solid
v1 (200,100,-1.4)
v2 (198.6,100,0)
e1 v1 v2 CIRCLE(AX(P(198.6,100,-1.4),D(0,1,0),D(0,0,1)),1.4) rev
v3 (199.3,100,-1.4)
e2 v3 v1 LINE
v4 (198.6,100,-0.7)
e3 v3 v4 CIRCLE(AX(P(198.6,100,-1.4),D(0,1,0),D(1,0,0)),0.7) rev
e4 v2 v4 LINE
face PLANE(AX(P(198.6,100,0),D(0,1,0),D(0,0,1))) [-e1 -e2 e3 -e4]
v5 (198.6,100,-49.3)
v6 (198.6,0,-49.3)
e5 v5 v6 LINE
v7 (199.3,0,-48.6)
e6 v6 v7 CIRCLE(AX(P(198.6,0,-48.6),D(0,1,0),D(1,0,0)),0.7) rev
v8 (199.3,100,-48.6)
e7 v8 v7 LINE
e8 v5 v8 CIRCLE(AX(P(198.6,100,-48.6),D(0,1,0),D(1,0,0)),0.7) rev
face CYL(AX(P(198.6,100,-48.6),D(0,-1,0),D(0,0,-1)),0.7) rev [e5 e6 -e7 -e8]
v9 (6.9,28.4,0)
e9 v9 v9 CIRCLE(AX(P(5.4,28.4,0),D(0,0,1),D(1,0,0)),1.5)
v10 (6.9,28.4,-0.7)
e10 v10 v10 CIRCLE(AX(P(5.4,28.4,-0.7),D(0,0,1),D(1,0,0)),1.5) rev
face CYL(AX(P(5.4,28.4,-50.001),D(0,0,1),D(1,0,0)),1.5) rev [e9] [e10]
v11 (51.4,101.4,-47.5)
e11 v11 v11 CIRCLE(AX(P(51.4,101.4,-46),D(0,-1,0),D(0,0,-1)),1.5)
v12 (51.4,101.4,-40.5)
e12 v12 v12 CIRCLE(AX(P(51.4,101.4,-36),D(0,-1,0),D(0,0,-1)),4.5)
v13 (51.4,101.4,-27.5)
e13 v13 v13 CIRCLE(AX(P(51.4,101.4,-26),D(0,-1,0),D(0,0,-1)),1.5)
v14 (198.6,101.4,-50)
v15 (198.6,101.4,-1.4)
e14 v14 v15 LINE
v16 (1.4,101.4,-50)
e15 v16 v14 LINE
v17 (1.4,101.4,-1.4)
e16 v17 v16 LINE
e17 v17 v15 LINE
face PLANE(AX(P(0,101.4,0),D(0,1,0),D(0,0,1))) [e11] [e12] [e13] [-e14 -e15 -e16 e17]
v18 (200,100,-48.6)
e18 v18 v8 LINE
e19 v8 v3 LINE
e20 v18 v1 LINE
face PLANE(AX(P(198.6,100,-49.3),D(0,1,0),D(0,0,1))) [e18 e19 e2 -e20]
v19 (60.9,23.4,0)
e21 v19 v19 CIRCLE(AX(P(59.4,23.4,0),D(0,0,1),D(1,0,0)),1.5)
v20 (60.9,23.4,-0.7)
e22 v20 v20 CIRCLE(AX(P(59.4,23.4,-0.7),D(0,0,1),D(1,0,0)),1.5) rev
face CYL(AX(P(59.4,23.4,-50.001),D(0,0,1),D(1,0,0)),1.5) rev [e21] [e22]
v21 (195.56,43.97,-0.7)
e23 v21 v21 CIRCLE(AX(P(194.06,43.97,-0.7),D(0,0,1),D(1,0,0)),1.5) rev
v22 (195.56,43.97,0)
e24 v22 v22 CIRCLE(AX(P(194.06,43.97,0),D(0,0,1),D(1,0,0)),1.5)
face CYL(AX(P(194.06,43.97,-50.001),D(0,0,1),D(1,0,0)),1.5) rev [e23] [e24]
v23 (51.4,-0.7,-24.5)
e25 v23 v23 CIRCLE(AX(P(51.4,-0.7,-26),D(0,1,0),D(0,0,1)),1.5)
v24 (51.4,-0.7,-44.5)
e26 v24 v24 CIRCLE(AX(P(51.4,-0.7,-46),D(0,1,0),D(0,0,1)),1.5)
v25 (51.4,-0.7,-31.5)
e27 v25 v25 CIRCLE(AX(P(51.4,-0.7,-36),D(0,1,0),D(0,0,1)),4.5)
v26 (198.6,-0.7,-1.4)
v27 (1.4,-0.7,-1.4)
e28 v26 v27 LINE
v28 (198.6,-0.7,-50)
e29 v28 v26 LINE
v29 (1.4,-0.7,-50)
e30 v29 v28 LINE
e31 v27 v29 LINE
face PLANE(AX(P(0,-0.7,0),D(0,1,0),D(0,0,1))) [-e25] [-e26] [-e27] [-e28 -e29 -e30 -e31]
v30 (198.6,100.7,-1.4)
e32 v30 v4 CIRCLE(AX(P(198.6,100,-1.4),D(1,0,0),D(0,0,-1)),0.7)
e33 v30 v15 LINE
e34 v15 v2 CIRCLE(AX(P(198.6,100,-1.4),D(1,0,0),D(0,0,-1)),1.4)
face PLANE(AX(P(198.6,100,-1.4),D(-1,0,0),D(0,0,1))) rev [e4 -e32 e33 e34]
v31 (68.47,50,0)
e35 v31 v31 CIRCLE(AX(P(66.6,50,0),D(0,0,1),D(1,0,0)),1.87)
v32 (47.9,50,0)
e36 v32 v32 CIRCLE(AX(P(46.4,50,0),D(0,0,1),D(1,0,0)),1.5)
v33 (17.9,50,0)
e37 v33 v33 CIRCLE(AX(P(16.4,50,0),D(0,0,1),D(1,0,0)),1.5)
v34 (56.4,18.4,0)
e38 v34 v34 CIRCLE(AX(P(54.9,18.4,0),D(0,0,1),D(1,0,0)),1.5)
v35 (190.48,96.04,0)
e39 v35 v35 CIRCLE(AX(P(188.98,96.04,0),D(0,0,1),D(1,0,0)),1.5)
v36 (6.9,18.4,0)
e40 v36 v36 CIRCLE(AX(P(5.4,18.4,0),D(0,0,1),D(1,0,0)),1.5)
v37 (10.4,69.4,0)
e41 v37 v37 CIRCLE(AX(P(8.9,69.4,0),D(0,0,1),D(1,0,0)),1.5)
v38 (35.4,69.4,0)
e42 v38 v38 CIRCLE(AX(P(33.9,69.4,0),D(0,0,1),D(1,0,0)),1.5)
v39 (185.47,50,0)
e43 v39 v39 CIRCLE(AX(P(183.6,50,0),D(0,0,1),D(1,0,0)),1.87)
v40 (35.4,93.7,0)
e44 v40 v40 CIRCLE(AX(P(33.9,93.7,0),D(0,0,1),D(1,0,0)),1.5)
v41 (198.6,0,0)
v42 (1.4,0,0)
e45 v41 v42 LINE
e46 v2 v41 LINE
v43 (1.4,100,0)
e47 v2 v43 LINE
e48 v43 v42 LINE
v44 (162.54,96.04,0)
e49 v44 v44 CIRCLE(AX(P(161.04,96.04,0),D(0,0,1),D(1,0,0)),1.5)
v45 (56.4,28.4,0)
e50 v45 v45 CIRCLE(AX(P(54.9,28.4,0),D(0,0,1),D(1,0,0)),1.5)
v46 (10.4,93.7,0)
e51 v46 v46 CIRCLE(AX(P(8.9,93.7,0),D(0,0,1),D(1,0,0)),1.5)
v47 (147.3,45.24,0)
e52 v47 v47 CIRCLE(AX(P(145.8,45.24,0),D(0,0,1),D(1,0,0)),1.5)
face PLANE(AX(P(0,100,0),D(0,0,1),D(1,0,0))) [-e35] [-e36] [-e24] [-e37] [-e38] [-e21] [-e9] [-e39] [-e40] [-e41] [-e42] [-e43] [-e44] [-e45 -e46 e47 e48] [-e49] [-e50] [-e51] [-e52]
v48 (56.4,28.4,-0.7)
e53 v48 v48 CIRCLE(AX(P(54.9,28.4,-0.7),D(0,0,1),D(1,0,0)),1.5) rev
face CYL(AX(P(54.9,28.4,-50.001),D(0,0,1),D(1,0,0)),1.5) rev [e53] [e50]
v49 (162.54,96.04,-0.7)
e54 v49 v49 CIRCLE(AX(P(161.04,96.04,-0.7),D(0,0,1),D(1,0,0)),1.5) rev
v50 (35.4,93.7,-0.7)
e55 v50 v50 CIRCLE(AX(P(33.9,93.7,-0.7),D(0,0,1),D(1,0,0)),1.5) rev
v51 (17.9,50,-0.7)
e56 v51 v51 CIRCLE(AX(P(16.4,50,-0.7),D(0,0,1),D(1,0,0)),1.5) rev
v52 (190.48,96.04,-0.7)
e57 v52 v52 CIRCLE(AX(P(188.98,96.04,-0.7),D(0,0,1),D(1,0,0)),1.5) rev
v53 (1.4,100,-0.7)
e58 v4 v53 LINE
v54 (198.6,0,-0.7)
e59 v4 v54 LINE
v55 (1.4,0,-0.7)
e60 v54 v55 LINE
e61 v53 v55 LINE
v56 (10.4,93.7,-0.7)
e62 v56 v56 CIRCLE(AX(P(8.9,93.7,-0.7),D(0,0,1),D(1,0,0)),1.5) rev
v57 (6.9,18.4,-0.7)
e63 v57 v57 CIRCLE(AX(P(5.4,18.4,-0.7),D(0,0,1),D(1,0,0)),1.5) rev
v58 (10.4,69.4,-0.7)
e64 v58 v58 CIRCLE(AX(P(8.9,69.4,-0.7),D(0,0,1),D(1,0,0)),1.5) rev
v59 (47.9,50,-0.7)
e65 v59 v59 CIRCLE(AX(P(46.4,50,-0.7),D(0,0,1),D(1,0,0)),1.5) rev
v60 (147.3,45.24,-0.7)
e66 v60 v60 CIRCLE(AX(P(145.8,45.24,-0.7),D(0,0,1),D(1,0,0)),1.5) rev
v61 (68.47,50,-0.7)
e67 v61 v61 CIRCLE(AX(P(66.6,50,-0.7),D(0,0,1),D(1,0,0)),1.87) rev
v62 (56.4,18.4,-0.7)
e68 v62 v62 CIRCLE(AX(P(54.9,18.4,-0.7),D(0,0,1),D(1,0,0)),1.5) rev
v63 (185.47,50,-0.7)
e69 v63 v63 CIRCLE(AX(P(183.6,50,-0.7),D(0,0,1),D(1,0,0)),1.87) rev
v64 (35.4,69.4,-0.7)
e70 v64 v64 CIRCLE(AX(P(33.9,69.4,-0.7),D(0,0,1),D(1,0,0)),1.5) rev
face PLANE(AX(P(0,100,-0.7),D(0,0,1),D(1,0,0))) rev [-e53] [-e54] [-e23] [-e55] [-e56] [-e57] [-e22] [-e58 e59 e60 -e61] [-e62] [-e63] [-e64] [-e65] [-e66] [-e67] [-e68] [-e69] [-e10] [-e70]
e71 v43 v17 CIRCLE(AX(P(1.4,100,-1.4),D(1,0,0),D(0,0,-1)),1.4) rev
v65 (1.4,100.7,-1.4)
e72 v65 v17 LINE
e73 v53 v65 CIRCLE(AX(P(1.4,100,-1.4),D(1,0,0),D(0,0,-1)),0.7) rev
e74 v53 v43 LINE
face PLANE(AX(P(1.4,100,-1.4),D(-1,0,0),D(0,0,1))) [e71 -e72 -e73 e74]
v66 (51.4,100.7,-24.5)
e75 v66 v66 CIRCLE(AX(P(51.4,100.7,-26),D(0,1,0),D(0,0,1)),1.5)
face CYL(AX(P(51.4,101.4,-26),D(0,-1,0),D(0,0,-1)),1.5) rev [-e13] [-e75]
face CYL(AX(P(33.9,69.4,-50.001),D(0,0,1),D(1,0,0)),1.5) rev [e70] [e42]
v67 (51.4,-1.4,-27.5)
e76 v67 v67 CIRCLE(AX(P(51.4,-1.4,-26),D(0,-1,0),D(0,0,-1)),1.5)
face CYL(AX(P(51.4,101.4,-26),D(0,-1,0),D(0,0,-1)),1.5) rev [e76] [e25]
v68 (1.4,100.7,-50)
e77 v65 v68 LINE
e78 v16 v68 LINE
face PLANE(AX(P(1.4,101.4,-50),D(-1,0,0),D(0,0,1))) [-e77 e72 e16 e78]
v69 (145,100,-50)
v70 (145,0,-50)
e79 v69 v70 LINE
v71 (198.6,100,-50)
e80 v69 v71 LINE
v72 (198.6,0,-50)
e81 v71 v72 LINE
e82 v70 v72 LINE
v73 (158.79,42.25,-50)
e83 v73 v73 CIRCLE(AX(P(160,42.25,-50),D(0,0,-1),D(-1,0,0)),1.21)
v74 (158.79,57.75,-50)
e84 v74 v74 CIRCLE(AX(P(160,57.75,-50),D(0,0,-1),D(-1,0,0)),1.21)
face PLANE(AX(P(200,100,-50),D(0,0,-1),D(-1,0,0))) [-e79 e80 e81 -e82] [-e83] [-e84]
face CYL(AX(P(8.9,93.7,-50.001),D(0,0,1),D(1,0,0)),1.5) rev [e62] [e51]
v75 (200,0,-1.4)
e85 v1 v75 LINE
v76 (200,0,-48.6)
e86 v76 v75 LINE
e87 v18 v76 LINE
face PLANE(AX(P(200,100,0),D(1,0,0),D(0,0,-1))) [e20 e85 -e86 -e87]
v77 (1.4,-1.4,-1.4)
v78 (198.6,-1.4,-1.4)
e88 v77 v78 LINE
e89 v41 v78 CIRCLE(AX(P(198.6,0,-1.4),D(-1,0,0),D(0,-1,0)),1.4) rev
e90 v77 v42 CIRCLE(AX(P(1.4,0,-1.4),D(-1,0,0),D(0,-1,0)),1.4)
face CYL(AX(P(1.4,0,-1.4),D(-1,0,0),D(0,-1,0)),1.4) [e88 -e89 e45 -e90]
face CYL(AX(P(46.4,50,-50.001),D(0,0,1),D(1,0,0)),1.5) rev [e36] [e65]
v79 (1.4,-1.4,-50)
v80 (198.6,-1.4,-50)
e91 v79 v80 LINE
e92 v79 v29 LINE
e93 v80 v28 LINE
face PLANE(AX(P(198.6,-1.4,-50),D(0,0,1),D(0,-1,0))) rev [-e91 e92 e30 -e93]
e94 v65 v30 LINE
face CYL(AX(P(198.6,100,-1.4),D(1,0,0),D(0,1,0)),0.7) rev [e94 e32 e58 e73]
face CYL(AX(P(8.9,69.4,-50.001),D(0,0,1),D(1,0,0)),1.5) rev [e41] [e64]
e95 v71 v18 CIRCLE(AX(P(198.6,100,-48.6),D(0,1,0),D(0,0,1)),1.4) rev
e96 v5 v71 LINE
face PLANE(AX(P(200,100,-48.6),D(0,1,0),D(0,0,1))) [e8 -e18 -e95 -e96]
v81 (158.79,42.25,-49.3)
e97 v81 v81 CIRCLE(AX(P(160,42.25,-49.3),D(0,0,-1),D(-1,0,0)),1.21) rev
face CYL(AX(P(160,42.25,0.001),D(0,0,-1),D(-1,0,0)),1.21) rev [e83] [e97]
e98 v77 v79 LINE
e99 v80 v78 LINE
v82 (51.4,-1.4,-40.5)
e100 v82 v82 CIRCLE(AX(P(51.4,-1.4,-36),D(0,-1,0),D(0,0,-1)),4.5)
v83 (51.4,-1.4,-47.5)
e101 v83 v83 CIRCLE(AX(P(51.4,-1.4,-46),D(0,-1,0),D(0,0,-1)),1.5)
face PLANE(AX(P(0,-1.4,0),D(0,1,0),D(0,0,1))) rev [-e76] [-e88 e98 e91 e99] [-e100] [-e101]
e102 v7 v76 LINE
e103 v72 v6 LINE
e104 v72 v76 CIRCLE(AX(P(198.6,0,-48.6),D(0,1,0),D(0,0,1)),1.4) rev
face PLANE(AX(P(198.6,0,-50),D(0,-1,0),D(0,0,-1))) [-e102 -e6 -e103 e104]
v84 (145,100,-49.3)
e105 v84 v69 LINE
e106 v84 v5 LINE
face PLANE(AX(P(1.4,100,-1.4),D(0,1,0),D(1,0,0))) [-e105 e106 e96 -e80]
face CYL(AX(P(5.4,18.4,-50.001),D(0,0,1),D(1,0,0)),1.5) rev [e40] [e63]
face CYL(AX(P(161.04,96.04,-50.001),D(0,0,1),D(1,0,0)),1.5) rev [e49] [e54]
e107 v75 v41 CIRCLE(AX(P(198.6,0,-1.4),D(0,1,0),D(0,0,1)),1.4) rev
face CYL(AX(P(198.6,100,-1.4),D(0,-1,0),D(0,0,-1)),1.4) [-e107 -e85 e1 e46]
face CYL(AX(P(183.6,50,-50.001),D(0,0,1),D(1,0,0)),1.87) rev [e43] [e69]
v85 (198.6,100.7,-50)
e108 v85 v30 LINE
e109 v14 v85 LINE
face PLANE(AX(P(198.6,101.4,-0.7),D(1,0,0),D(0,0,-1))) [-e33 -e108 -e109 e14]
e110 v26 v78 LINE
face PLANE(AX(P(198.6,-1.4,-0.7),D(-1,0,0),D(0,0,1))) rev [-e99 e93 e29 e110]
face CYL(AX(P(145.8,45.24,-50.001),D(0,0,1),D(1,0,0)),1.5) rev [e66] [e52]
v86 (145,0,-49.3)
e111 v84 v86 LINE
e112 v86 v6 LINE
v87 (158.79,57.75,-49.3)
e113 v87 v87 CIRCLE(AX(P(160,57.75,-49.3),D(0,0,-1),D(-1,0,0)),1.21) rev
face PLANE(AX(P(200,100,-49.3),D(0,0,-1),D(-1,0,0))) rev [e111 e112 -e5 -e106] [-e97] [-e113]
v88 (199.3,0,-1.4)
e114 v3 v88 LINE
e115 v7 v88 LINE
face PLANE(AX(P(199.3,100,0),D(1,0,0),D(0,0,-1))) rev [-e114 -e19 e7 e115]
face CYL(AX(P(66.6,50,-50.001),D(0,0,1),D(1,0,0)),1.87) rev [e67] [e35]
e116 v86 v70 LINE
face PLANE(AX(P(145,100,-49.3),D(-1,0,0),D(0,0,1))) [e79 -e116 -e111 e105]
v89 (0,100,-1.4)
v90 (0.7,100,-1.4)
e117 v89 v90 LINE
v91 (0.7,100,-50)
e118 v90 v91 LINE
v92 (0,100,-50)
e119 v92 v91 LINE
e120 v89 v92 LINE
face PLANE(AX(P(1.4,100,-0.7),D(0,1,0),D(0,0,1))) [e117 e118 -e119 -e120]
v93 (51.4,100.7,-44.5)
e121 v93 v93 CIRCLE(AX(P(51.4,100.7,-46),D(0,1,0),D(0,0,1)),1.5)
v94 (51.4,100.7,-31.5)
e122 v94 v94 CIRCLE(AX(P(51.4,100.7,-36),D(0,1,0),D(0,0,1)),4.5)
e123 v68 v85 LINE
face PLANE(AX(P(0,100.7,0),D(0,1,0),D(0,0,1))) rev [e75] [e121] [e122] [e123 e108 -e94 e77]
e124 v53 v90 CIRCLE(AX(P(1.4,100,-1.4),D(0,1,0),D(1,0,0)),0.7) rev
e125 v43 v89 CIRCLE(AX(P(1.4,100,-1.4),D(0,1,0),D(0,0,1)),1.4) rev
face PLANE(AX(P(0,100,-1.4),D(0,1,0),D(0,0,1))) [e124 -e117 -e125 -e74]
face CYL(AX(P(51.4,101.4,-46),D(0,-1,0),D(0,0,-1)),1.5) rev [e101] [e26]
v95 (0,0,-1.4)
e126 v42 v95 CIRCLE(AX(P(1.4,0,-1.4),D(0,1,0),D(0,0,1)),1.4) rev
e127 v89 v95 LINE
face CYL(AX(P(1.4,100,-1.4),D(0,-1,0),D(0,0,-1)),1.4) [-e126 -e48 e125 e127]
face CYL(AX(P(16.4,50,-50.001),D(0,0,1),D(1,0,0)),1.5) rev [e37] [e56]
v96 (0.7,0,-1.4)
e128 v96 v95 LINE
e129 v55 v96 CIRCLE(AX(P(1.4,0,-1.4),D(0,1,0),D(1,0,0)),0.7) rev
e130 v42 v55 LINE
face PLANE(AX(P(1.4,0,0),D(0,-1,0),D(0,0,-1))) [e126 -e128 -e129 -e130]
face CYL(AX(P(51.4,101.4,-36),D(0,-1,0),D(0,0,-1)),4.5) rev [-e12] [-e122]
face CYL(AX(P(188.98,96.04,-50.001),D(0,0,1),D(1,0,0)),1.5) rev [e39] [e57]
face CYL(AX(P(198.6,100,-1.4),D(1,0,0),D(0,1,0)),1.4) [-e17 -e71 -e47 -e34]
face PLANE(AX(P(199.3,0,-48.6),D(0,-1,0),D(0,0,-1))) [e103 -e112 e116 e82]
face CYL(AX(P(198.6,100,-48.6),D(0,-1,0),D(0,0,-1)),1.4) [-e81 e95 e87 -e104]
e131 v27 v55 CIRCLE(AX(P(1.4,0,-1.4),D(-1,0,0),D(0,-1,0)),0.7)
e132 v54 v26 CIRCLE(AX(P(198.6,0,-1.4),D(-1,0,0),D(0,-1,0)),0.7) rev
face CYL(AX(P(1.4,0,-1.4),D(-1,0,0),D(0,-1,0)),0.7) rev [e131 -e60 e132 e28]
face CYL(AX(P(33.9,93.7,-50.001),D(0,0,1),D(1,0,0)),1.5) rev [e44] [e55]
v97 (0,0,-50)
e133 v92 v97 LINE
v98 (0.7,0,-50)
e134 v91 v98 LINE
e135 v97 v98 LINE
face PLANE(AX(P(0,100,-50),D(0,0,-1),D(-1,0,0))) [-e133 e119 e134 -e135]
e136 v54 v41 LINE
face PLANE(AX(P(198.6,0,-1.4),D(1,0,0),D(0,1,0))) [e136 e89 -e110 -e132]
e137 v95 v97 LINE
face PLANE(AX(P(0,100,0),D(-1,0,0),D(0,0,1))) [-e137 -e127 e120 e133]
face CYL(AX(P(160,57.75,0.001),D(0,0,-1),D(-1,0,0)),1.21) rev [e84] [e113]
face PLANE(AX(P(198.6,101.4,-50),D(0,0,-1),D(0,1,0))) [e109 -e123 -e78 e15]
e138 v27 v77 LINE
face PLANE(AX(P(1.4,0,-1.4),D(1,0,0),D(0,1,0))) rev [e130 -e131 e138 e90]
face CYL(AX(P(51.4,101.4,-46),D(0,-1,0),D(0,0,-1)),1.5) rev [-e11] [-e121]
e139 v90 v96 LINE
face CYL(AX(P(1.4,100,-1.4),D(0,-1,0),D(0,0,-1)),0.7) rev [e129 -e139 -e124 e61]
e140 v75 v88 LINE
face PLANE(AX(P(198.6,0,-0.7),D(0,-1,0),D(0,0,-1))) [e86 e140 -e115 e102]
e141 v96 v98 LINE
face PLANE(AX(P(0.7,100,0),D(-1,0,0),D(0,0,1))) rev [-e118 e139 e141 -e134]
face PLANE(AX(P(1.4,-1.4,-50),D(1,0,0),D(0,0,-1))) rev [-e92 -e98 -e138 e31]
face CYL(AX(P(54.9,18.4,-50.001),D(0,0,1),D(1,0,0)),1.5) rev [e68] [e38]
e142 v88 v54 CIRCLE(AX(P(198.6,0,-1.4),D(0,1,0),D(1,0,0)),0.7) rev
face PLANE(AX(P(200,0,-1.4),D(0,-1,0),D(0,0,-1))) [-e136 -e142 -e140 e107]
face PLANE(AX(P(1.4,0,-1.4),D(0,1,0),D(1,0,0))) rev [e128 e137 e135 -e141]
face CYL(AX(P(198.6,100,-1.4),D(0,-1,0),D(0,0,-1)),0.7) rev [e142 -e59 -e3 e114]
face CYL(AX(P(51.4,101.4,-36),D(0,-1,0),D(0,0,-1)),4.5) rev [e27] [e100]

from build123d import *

# Parameters (mm, degrees)
BASE_FLANGE1_DEPTH = 100
EDGE_FLANGE1_DEPTH = 197.2
EDGE_FLANGE2_DEPTH = 197.2
HOLE1_START        = -1.4
HOLE1_OUTLINE_R    = 4.5
HOLE1_OUTLINE_R_2  = 1.5
HOLE1_DEPTH        = 102.8
CUT_EXTRUDE2_REACH = 231.743
SKETCH20_R         = 1.21
CUT_EXTRUDE3_REACH = 231.743
SKETCH22_R         = 1.5
SKETCH22_R_2       = 1.87
CUT_EXTRUDE5_REACH = 231.743
SKETCH26_R         = 1.5
CUT_EXTRUDE6_REACH = 231.743
SKETCH27_R         = 1.5
CUT_EXTRUDE7_REACH = 231.743
SKETCH28_R         = 1.5


# Read off the part's stored shape, not the designer's step: Hole1
# Sheet-metal steps are written as plain solids
with BuildPart() as part:
    # Sketch1 → Base-Flange1 (new body)
    with BuildSketch(Plane(origin=(0, 0, 0), x_dir=(1, 0, 0), z_dir=(0, 1, 0))):
        with BuildLine():
            Line((0, 50), (0, 1.4))
            ThreePointArc((0, 1.4), (0.410050506, 0.410050506), (1.4, 0))
            Line((1.4, 0), (198.6, 0))
            ThreePointArc((198.6, 0), (199.589949494, 0.410050506), (200, 1.4))
            Line((200, 1.4), (200, 48.6))
            ThreePointArc((200, 48.6), (199.589949494, 49.589949494), (198.6, 50))
            Line((198.6, 50), (145, 50))
            Line((145, 50), (145, 49.3))
            Line((145, 49.3), (198.6, 49.3))
            ThreePointArc((198.6, 49.3), (199.094974747, 49.094974747), (199.3, 48.6))
            Line((199.3, 48.6), (199.3, 1.4))
            ThreePointArc((199.3, 1.4), (199.094974747, 0.905025253), (198.6, 0.7))
            Line((198.6, 0.7), (1.4, 0.7))
            ThreePointArc((1.4, 0.7), (0.905025253, 0.905025253), (0.7, 1.4))
            Line((0.7, 1.4), (0.7, 50))
            Line((0.7, 50), (0, 50))
        make_face()
    extrude(amount=BASE_FLANGE1_DEPTH)

    # Edge-Flange1 section (across the edge) → Edge-Flange1 (add)
    with BuildSketch(Plane(origin=(198.6, -0.7, -0.7), x_dir=(0, 1, 0), z_dir=(-1, 0, 0))):
        with BuildLine():
            Line((-0.7, 0.7), (-0.7, 49.3))
            Line((-0.7, 49.3), (0, 49.3))
            Line((0, 49.3), (0, 0.7))
            ThreePointArc((0, 0.7), (0.205025253, 0.205025253), (0.7, 0))
            Line((0.7, 0), (0.7, -0.7))
            ThreePointArc((0.7, -0.7), (-0.289949494, -0.289949494), (-0.7, 0.7))
        make_face()
    extrude(amount=EDGE_FLANGE1_DEPTH)

    # Edge-Flange2 section (across the edge) → Edge-Flange2 (add)
    with BuildSketch(Plane(origin=(1.4, 100.7, -0.7), x_dir=(0, -1, 0), z_dir=(1, 0, 0))):
        with BuildLine():
            Line((-0.7, 0.7), (-0.7, 49.3))
            Line((-0.7, 49.3), (0, 49.3))
            Line((0, 49.3), (0, 0.7))
            ThreePointArc((0, 0.7), (0.205025253, 0.205025253), (0.7, 0))
            Line((0.7, 0), (0.7, -0.7))
            ThreePointArc((0.7, -0.7), (-0.289949494, -0.289949494), (-0.7, 0.7))
        make_face()
    extrude(amount=EDGE_FLANGE2_DEPTH)

    # Hole1 outline → Hole1 (cut)
    with BuildSketch(Plane(origin=(0, 0, 0), x_dir=(1, 0, 0), z_dir=(0, 1, 0)).offset(HOLE1_START)):
        with Locations((51.4, 36)):
            Circle(HOLE1_OUTLINE_R)
        with Locations((51.4, 26)):
            Circle(HOLE1_OUTLINE_R_2)
        with Locations((51.4, 46)):
            Circle(HOLE1_OUTLINE_R_2)
    extrude(amount=HOLE1_DEPTH, mode=Mode.SUBTRACT)

    # Sketch20 → Cut-Extrude2 (cut, up to next)
    with BuildSketch(Plane(origin=(0, 0, -50), x_dir=(-1, 0, 0), z_dir=(0, 0, -1)), mode=Mode.PRIVATE) as cut_extrude2_sk1:
        with Locations((-160, 57.75)):
            Circle(SKETCH20_R)
    cut_extrude2_tool1 = extrude(cut_extrude2_sk1.sketch, amount=-CUT_EXTRUDE2_REACH, mode=Mode.PRIVATE) & part.part
    # Sketch20 → Cut-Extrude2 (cut, up to next)
    with BuildSketch(Plane(origin=(0, 0, -50), x_dir=(-1, 0, 0), z_dir=(0, 0, -1)), mode=Mode.PRIVATE) as cut_extrude2_sk2:
        with Locations((-160, 42.25)):
            Circle(SKETCH20_R)
    cut_extrude2_tool2 = extrude(cut_extrude2_sk2.sketch, amount=-CUT_EXTRUDE2_REACH, mode=Mode.PRIVATE) & part.part
    add(cut_extrude2_tool1.solids().sort_by_distance((160, 57.75, -50))[0], mode=Mode.SUBTRACT)
    add(cut_extrude2_tool2.solids().sort_by_distance((160, 42.25, -50))[0], mode=Mode.SUBTRACT)

    # Sketch22 → Cut-Extrude3 (cut, up to next)
    with BuildSketch(Plane.XY, mode=Mode.PRIVATE) as cut_extrude3_sk1:
        with Locations((16.4, 50)):
            Circle(SKETCH22_R)
    cut_extrude3_tool1 = extrude(cut_extrude3_sk1.sketch, amount=-CUT_EXTRUDE3_REACH, mode=Mode.PRIVATE) & part.part
    # Sketch22 → Cut-Extrude3 (cut, up to next)
    with BuildSketch(Plane.XY, mode=Mode.PRIVATE) as cut_extrude3_sk2:
        with Locations((46.4, 50)):
            Circle(SKETCH22_R)
    cut_extrude3_tool2 = extrude(cut_extrude3_sk2.sketch, amount=-CUT_EXTRUDE3_REACH, mode=Mode.PRIVATE) & part.part
    # Sketch22 → Cut-Extrude3 (cut, up to next)
    with BuildSketch(Plane.XY, mode=Mode.PRIVATE) as cut_extrude3_sk3:
        with Locations((66.6, 50)):
            Circle(SKETCH22_R_2)
    cut_extrude3_tool3 = extrude(cut_extrude3_sk3.sketch, amount=-CUT_EXTRUDE3_REACH, mode=Mode.PRIVATE) & part.part
    # Sketch22 → Cut-Extrude3 (cut, up to next)
    with BuildSketch(Plane.XY, mode=Mode.PRIVATE) as cut_extrude3_sk4:
        with Locations((183.6, 50)):
            Circle(SKETCH22_R_2)
    cut_extrude3_tool4 = extrude(cut_extrude3_sk4.sketch, amount=-CUT_EXTRUDE3_REACH, mode=Mode.PRIVATE) & part.part
    add(cut_extrude3_tool1.solids().sort_by_distance((16.4, 50, 0))[0], mode=Mode.SUBTRACT)
    add(cut_extrude3_tool2.solids().sort_by_distance((46.4, 50, 0))[0], mode=Mode.SUBTRACT)
    add(cut_extrude3_tool3.solids().sort_by_distance((66.6, 50, 0))[0], mode=Mode.SUBTRACT)
    add(cut_extrude3_tool4.solids().sort_by_distance((183.6, 50, 0))[0], mode=Mode.SUBTRACT)

    # Sketch26 → Cut-Extrude5 (cut, up to next)
    with BuildSketch(Plane.XY, mode=Mode.PRIVATE) as cut_extrude5_sk1:
        with Locations((5.4, 28.4)):
            Circle(SKETCH26_R)
    cut_extrude5_tool1 = extrude(cut_extrude5_sk1.sketch, amount=-CUT_EXTRUDE5_REACH, mode=Mode.PRIVATE) & part.part
    # Sketch26 → Cut-Extrude5 (cut, up to next)
    with BuildSketch(Plane.XY, mode=Mode.PRIVATE) as cut_extrude5_sk2:
        with Locations((54.9, 28.4)):
            Circle(SKETCH26_R)
    cut_extrude5_tool2 = extrude(cut_extrude5_sk2.sketch, amount=-CUT_EXTRUDE5_REACH, mode=Mode.PRIVATE) & part.part
    # Sketch26 → Cut-Extrude5 (cut, up to next)
    with BuildSketch(Plane.XY, mode=Mode.PRIVATE) as cut_extrude5_sk3:
        with Locations((54.9, 18.4)):
            Circle(SKETCH26_R)
    cut_extrude5_tool3 = extrude(cut_extrude5_sk3.sketch, amount=-CUT_EXTRUDE5_REACH, mode=Mode.PRIVATE) & part.part
    # Sketch26 → Cut-Extrude5 (cut, up to next)
    with BuildSketch(Plane.XY, mode=Mode.PRIVATE) as cut_extrude5_sk4:
        with Locations((5.4, 18.4)):
            Circle(SKETCH26_R)
    cut_extrude5_tool4 = extrude(cut_extrude5_sk4.sketch, amount=-CUT_EXTRUDE5_REACH, mode=Mode.PRIVATE) & part.part
    # Sketch26 → Cut-Extrude5 (cut, up to next)
    with BuildSketch(Plane.XY, mode=Mode.PRIVATE) as cut_extrude5_sk5:
        with Locations((59.4, 23.4)):
            Circle(SKETCH26_R)
    cut_extrude5_tool5 = extrude(cut_extrude5_sk5.sketch, amount=-CUT_EXTRUDE5_REACH, mode=Mode.PRIVATE) & part.part
    add(cut_extrude5_tool1.solids().sort_by_distance((5.4, 28.4, 0))[0], mode=Mode.SUBTRACT)
    add(cut_extrude5_tool2.solids().sort_by_distance((54.9, 28.4, 0))[0], mode=Mode.SUBTRACT)
    add(cut_extrude5_tool3.solids().sort_by_distance((54.9, 18.4, 0))[0], mode=Mode.SUBTRACT)
    add(cut_extrude5_tool4.solids().sort_by_distance((5.4, 18.4, 0))[0], mode=Mode.SUBTRACT)
    add(cut_extrude5_tool5.solids().sort_by_distance((59.4, 23.4, 0))[0], mode=Mode.SUBTRACT)

    # Sketch27 → Cut-Extrude6 (cut, up to next)
    with BuildSketch(Plane.XY, mode=Mode.PRIVATE) as cut_extrude6_sk1:
        with Locations((8.9, 93.7)):
            Circle(SKETCH27_R)
    cut_extrude6_tool1 = extrude(cut_extrude6_sk1.sketch, amount=-CUT_EXTRUDE6_REACH, mode=Mode.PRIVATE) & part.part
    # Sketch27 → Cut-Extrude6 (cut, up to next)
    with BuildSketch(Plane.XY, mode=Mode.PRIVATE) as cut_extrude6_sk2:
        with Locations((8.9, 69.4)):
            Circle(SKETCH27_R)
    cut_extrude6_tool2 = extrude(cut_extrude6_sk2.sketch, amount=-CUT_EXTRUDE6_REACH, mode=Mode.PRIVATE) & part.part
    # Sketch27 → Cut-Extrude6 (cut, up to next)
    with BuildSketch(Plane.XY, mode=Mode.PRIVATE) as cut_extrude6_sk3:
        with Locations((33.9, 93.7)):
            Circle(SKETCH27_R)
    cut_extrude6_tool3 = extrude(cut_extrude6_sk3.sketch, amount=-CUT_EXTRUDE6_REACH, mode=Mode.PRIVATE) & part.part
    # Sketch27 → Cut-Extrude6 (cut, up to next)
    with BuildSketch(Plane.XY, mode=Mode.PRIVATE) as cut_extrude6_sk4:
        with Locations((33.9, 69.4)):
            Circle(SKETCH27_R)
    cut_extrude6_tool4 = extrude(cut_extrude6_sk4.sketch, amount=-CUT_EXTRUDE6_REACH, mode=Mode.PRIVATE) & part.part
    add(cut_extrude6_tool1.solids().sort_by_distance((8.9, 93.7, 0))[0], mode=Mode.SUBTRACT)
    add(cut_extrude6_tool2.solids().sort_by_distance((8.9, 69.4, 0))[0], mode=Mode.SUBTRACT)
    add(cut_extrude6_tool3.solids().sort_by_distance((33.9, 93.7, 0))[0], mode=Mode.SUBTRACT)
    add(cut_extrude6_tool4.solids().sort_by_distance((33.9, 69.4, 0))[0], mode=Mode.SUBTRACT)

    # Sketch28 → Cut-Extrude7 (cut, up to next)
    with BuildSketch(Plane.XY, mode=Mode.PRIVATE) as cut_extrude7_sk1:
        with Locations((194.06, 43.97)):
            Circle(SKETCH28_R)
    cut_extrude7_tool1 = extrude(cut_extrude7_sk1.sketch, amount=-CUT_EXTRUDE7_REACH, mode=Mode.PRIVATE) & part.part
    # Sketch28 → Cut-Extrude7 (cut, up to next)
    with BuildSketch(Plane.XY, mode=Mode.PRIVATE) as cut_extrude7_sk2:
        with Locations((145.8, 45.24)):
            Circle(SKETCH28_R)
    cut_extrude7_tool2 = extrude(cut_extrude7_sk2.sketch, amount=-CUT_EXTRUDE7_REACH, mode=Mode.PRIVATE) & part.part
    # Sketch28 → Cut-Extrude7 (cut, up to next)
    with BuildSketch(Plane.XY, mode=Mode.PRIVATE) as cut_extrude7_sk3:
        with Locations((161.04, 96.04)):
            Circle(SKETCH28_R)
    cut_extrude7_tool3 = extrude(cut_extrude7_sk3.sketch, amount=-CUT_EXTRUDE7_REACH, mode=Mode.PRIVATE) & part.part
    # Sketch28 → Cut-Extrude7 (cut, up to next)
    with BuildSketch(Plane.XY, mode=Mode.PRIVATE) as cut_extrude7_sk4:
        with Locations((188.98, 96.04)):
            Circle(SKETCH28_R)
    cut_extrude7_tool4 = extrude(cut_extrude7_sk4.sketch, amount=-CUT_EXTRUDE7_REACH, mode=Mode.PRIVATE) & part.part
    add(cut_extrude7_tool1.solids().sort_by_distance((194.06, 43.97, 0))[0], mode=Mode.SUBTRACT)
    add(cut_extrude7_tool2.solids().sort_by_distance((145.8, 45.24, 0))[0], mode=Mode.SUBTRACT)
    add(cut_extrude7_tool3.solids().sort_by_distance((161.04, 96.04, 0))[0], mode=Mode.SUBTRACT)
    add(cut_extrude7_tool4.solids().sort_by_distance((188.98, 96.04, 0))[0], mode=Mode.SUBTRACT)


solid = part.part
